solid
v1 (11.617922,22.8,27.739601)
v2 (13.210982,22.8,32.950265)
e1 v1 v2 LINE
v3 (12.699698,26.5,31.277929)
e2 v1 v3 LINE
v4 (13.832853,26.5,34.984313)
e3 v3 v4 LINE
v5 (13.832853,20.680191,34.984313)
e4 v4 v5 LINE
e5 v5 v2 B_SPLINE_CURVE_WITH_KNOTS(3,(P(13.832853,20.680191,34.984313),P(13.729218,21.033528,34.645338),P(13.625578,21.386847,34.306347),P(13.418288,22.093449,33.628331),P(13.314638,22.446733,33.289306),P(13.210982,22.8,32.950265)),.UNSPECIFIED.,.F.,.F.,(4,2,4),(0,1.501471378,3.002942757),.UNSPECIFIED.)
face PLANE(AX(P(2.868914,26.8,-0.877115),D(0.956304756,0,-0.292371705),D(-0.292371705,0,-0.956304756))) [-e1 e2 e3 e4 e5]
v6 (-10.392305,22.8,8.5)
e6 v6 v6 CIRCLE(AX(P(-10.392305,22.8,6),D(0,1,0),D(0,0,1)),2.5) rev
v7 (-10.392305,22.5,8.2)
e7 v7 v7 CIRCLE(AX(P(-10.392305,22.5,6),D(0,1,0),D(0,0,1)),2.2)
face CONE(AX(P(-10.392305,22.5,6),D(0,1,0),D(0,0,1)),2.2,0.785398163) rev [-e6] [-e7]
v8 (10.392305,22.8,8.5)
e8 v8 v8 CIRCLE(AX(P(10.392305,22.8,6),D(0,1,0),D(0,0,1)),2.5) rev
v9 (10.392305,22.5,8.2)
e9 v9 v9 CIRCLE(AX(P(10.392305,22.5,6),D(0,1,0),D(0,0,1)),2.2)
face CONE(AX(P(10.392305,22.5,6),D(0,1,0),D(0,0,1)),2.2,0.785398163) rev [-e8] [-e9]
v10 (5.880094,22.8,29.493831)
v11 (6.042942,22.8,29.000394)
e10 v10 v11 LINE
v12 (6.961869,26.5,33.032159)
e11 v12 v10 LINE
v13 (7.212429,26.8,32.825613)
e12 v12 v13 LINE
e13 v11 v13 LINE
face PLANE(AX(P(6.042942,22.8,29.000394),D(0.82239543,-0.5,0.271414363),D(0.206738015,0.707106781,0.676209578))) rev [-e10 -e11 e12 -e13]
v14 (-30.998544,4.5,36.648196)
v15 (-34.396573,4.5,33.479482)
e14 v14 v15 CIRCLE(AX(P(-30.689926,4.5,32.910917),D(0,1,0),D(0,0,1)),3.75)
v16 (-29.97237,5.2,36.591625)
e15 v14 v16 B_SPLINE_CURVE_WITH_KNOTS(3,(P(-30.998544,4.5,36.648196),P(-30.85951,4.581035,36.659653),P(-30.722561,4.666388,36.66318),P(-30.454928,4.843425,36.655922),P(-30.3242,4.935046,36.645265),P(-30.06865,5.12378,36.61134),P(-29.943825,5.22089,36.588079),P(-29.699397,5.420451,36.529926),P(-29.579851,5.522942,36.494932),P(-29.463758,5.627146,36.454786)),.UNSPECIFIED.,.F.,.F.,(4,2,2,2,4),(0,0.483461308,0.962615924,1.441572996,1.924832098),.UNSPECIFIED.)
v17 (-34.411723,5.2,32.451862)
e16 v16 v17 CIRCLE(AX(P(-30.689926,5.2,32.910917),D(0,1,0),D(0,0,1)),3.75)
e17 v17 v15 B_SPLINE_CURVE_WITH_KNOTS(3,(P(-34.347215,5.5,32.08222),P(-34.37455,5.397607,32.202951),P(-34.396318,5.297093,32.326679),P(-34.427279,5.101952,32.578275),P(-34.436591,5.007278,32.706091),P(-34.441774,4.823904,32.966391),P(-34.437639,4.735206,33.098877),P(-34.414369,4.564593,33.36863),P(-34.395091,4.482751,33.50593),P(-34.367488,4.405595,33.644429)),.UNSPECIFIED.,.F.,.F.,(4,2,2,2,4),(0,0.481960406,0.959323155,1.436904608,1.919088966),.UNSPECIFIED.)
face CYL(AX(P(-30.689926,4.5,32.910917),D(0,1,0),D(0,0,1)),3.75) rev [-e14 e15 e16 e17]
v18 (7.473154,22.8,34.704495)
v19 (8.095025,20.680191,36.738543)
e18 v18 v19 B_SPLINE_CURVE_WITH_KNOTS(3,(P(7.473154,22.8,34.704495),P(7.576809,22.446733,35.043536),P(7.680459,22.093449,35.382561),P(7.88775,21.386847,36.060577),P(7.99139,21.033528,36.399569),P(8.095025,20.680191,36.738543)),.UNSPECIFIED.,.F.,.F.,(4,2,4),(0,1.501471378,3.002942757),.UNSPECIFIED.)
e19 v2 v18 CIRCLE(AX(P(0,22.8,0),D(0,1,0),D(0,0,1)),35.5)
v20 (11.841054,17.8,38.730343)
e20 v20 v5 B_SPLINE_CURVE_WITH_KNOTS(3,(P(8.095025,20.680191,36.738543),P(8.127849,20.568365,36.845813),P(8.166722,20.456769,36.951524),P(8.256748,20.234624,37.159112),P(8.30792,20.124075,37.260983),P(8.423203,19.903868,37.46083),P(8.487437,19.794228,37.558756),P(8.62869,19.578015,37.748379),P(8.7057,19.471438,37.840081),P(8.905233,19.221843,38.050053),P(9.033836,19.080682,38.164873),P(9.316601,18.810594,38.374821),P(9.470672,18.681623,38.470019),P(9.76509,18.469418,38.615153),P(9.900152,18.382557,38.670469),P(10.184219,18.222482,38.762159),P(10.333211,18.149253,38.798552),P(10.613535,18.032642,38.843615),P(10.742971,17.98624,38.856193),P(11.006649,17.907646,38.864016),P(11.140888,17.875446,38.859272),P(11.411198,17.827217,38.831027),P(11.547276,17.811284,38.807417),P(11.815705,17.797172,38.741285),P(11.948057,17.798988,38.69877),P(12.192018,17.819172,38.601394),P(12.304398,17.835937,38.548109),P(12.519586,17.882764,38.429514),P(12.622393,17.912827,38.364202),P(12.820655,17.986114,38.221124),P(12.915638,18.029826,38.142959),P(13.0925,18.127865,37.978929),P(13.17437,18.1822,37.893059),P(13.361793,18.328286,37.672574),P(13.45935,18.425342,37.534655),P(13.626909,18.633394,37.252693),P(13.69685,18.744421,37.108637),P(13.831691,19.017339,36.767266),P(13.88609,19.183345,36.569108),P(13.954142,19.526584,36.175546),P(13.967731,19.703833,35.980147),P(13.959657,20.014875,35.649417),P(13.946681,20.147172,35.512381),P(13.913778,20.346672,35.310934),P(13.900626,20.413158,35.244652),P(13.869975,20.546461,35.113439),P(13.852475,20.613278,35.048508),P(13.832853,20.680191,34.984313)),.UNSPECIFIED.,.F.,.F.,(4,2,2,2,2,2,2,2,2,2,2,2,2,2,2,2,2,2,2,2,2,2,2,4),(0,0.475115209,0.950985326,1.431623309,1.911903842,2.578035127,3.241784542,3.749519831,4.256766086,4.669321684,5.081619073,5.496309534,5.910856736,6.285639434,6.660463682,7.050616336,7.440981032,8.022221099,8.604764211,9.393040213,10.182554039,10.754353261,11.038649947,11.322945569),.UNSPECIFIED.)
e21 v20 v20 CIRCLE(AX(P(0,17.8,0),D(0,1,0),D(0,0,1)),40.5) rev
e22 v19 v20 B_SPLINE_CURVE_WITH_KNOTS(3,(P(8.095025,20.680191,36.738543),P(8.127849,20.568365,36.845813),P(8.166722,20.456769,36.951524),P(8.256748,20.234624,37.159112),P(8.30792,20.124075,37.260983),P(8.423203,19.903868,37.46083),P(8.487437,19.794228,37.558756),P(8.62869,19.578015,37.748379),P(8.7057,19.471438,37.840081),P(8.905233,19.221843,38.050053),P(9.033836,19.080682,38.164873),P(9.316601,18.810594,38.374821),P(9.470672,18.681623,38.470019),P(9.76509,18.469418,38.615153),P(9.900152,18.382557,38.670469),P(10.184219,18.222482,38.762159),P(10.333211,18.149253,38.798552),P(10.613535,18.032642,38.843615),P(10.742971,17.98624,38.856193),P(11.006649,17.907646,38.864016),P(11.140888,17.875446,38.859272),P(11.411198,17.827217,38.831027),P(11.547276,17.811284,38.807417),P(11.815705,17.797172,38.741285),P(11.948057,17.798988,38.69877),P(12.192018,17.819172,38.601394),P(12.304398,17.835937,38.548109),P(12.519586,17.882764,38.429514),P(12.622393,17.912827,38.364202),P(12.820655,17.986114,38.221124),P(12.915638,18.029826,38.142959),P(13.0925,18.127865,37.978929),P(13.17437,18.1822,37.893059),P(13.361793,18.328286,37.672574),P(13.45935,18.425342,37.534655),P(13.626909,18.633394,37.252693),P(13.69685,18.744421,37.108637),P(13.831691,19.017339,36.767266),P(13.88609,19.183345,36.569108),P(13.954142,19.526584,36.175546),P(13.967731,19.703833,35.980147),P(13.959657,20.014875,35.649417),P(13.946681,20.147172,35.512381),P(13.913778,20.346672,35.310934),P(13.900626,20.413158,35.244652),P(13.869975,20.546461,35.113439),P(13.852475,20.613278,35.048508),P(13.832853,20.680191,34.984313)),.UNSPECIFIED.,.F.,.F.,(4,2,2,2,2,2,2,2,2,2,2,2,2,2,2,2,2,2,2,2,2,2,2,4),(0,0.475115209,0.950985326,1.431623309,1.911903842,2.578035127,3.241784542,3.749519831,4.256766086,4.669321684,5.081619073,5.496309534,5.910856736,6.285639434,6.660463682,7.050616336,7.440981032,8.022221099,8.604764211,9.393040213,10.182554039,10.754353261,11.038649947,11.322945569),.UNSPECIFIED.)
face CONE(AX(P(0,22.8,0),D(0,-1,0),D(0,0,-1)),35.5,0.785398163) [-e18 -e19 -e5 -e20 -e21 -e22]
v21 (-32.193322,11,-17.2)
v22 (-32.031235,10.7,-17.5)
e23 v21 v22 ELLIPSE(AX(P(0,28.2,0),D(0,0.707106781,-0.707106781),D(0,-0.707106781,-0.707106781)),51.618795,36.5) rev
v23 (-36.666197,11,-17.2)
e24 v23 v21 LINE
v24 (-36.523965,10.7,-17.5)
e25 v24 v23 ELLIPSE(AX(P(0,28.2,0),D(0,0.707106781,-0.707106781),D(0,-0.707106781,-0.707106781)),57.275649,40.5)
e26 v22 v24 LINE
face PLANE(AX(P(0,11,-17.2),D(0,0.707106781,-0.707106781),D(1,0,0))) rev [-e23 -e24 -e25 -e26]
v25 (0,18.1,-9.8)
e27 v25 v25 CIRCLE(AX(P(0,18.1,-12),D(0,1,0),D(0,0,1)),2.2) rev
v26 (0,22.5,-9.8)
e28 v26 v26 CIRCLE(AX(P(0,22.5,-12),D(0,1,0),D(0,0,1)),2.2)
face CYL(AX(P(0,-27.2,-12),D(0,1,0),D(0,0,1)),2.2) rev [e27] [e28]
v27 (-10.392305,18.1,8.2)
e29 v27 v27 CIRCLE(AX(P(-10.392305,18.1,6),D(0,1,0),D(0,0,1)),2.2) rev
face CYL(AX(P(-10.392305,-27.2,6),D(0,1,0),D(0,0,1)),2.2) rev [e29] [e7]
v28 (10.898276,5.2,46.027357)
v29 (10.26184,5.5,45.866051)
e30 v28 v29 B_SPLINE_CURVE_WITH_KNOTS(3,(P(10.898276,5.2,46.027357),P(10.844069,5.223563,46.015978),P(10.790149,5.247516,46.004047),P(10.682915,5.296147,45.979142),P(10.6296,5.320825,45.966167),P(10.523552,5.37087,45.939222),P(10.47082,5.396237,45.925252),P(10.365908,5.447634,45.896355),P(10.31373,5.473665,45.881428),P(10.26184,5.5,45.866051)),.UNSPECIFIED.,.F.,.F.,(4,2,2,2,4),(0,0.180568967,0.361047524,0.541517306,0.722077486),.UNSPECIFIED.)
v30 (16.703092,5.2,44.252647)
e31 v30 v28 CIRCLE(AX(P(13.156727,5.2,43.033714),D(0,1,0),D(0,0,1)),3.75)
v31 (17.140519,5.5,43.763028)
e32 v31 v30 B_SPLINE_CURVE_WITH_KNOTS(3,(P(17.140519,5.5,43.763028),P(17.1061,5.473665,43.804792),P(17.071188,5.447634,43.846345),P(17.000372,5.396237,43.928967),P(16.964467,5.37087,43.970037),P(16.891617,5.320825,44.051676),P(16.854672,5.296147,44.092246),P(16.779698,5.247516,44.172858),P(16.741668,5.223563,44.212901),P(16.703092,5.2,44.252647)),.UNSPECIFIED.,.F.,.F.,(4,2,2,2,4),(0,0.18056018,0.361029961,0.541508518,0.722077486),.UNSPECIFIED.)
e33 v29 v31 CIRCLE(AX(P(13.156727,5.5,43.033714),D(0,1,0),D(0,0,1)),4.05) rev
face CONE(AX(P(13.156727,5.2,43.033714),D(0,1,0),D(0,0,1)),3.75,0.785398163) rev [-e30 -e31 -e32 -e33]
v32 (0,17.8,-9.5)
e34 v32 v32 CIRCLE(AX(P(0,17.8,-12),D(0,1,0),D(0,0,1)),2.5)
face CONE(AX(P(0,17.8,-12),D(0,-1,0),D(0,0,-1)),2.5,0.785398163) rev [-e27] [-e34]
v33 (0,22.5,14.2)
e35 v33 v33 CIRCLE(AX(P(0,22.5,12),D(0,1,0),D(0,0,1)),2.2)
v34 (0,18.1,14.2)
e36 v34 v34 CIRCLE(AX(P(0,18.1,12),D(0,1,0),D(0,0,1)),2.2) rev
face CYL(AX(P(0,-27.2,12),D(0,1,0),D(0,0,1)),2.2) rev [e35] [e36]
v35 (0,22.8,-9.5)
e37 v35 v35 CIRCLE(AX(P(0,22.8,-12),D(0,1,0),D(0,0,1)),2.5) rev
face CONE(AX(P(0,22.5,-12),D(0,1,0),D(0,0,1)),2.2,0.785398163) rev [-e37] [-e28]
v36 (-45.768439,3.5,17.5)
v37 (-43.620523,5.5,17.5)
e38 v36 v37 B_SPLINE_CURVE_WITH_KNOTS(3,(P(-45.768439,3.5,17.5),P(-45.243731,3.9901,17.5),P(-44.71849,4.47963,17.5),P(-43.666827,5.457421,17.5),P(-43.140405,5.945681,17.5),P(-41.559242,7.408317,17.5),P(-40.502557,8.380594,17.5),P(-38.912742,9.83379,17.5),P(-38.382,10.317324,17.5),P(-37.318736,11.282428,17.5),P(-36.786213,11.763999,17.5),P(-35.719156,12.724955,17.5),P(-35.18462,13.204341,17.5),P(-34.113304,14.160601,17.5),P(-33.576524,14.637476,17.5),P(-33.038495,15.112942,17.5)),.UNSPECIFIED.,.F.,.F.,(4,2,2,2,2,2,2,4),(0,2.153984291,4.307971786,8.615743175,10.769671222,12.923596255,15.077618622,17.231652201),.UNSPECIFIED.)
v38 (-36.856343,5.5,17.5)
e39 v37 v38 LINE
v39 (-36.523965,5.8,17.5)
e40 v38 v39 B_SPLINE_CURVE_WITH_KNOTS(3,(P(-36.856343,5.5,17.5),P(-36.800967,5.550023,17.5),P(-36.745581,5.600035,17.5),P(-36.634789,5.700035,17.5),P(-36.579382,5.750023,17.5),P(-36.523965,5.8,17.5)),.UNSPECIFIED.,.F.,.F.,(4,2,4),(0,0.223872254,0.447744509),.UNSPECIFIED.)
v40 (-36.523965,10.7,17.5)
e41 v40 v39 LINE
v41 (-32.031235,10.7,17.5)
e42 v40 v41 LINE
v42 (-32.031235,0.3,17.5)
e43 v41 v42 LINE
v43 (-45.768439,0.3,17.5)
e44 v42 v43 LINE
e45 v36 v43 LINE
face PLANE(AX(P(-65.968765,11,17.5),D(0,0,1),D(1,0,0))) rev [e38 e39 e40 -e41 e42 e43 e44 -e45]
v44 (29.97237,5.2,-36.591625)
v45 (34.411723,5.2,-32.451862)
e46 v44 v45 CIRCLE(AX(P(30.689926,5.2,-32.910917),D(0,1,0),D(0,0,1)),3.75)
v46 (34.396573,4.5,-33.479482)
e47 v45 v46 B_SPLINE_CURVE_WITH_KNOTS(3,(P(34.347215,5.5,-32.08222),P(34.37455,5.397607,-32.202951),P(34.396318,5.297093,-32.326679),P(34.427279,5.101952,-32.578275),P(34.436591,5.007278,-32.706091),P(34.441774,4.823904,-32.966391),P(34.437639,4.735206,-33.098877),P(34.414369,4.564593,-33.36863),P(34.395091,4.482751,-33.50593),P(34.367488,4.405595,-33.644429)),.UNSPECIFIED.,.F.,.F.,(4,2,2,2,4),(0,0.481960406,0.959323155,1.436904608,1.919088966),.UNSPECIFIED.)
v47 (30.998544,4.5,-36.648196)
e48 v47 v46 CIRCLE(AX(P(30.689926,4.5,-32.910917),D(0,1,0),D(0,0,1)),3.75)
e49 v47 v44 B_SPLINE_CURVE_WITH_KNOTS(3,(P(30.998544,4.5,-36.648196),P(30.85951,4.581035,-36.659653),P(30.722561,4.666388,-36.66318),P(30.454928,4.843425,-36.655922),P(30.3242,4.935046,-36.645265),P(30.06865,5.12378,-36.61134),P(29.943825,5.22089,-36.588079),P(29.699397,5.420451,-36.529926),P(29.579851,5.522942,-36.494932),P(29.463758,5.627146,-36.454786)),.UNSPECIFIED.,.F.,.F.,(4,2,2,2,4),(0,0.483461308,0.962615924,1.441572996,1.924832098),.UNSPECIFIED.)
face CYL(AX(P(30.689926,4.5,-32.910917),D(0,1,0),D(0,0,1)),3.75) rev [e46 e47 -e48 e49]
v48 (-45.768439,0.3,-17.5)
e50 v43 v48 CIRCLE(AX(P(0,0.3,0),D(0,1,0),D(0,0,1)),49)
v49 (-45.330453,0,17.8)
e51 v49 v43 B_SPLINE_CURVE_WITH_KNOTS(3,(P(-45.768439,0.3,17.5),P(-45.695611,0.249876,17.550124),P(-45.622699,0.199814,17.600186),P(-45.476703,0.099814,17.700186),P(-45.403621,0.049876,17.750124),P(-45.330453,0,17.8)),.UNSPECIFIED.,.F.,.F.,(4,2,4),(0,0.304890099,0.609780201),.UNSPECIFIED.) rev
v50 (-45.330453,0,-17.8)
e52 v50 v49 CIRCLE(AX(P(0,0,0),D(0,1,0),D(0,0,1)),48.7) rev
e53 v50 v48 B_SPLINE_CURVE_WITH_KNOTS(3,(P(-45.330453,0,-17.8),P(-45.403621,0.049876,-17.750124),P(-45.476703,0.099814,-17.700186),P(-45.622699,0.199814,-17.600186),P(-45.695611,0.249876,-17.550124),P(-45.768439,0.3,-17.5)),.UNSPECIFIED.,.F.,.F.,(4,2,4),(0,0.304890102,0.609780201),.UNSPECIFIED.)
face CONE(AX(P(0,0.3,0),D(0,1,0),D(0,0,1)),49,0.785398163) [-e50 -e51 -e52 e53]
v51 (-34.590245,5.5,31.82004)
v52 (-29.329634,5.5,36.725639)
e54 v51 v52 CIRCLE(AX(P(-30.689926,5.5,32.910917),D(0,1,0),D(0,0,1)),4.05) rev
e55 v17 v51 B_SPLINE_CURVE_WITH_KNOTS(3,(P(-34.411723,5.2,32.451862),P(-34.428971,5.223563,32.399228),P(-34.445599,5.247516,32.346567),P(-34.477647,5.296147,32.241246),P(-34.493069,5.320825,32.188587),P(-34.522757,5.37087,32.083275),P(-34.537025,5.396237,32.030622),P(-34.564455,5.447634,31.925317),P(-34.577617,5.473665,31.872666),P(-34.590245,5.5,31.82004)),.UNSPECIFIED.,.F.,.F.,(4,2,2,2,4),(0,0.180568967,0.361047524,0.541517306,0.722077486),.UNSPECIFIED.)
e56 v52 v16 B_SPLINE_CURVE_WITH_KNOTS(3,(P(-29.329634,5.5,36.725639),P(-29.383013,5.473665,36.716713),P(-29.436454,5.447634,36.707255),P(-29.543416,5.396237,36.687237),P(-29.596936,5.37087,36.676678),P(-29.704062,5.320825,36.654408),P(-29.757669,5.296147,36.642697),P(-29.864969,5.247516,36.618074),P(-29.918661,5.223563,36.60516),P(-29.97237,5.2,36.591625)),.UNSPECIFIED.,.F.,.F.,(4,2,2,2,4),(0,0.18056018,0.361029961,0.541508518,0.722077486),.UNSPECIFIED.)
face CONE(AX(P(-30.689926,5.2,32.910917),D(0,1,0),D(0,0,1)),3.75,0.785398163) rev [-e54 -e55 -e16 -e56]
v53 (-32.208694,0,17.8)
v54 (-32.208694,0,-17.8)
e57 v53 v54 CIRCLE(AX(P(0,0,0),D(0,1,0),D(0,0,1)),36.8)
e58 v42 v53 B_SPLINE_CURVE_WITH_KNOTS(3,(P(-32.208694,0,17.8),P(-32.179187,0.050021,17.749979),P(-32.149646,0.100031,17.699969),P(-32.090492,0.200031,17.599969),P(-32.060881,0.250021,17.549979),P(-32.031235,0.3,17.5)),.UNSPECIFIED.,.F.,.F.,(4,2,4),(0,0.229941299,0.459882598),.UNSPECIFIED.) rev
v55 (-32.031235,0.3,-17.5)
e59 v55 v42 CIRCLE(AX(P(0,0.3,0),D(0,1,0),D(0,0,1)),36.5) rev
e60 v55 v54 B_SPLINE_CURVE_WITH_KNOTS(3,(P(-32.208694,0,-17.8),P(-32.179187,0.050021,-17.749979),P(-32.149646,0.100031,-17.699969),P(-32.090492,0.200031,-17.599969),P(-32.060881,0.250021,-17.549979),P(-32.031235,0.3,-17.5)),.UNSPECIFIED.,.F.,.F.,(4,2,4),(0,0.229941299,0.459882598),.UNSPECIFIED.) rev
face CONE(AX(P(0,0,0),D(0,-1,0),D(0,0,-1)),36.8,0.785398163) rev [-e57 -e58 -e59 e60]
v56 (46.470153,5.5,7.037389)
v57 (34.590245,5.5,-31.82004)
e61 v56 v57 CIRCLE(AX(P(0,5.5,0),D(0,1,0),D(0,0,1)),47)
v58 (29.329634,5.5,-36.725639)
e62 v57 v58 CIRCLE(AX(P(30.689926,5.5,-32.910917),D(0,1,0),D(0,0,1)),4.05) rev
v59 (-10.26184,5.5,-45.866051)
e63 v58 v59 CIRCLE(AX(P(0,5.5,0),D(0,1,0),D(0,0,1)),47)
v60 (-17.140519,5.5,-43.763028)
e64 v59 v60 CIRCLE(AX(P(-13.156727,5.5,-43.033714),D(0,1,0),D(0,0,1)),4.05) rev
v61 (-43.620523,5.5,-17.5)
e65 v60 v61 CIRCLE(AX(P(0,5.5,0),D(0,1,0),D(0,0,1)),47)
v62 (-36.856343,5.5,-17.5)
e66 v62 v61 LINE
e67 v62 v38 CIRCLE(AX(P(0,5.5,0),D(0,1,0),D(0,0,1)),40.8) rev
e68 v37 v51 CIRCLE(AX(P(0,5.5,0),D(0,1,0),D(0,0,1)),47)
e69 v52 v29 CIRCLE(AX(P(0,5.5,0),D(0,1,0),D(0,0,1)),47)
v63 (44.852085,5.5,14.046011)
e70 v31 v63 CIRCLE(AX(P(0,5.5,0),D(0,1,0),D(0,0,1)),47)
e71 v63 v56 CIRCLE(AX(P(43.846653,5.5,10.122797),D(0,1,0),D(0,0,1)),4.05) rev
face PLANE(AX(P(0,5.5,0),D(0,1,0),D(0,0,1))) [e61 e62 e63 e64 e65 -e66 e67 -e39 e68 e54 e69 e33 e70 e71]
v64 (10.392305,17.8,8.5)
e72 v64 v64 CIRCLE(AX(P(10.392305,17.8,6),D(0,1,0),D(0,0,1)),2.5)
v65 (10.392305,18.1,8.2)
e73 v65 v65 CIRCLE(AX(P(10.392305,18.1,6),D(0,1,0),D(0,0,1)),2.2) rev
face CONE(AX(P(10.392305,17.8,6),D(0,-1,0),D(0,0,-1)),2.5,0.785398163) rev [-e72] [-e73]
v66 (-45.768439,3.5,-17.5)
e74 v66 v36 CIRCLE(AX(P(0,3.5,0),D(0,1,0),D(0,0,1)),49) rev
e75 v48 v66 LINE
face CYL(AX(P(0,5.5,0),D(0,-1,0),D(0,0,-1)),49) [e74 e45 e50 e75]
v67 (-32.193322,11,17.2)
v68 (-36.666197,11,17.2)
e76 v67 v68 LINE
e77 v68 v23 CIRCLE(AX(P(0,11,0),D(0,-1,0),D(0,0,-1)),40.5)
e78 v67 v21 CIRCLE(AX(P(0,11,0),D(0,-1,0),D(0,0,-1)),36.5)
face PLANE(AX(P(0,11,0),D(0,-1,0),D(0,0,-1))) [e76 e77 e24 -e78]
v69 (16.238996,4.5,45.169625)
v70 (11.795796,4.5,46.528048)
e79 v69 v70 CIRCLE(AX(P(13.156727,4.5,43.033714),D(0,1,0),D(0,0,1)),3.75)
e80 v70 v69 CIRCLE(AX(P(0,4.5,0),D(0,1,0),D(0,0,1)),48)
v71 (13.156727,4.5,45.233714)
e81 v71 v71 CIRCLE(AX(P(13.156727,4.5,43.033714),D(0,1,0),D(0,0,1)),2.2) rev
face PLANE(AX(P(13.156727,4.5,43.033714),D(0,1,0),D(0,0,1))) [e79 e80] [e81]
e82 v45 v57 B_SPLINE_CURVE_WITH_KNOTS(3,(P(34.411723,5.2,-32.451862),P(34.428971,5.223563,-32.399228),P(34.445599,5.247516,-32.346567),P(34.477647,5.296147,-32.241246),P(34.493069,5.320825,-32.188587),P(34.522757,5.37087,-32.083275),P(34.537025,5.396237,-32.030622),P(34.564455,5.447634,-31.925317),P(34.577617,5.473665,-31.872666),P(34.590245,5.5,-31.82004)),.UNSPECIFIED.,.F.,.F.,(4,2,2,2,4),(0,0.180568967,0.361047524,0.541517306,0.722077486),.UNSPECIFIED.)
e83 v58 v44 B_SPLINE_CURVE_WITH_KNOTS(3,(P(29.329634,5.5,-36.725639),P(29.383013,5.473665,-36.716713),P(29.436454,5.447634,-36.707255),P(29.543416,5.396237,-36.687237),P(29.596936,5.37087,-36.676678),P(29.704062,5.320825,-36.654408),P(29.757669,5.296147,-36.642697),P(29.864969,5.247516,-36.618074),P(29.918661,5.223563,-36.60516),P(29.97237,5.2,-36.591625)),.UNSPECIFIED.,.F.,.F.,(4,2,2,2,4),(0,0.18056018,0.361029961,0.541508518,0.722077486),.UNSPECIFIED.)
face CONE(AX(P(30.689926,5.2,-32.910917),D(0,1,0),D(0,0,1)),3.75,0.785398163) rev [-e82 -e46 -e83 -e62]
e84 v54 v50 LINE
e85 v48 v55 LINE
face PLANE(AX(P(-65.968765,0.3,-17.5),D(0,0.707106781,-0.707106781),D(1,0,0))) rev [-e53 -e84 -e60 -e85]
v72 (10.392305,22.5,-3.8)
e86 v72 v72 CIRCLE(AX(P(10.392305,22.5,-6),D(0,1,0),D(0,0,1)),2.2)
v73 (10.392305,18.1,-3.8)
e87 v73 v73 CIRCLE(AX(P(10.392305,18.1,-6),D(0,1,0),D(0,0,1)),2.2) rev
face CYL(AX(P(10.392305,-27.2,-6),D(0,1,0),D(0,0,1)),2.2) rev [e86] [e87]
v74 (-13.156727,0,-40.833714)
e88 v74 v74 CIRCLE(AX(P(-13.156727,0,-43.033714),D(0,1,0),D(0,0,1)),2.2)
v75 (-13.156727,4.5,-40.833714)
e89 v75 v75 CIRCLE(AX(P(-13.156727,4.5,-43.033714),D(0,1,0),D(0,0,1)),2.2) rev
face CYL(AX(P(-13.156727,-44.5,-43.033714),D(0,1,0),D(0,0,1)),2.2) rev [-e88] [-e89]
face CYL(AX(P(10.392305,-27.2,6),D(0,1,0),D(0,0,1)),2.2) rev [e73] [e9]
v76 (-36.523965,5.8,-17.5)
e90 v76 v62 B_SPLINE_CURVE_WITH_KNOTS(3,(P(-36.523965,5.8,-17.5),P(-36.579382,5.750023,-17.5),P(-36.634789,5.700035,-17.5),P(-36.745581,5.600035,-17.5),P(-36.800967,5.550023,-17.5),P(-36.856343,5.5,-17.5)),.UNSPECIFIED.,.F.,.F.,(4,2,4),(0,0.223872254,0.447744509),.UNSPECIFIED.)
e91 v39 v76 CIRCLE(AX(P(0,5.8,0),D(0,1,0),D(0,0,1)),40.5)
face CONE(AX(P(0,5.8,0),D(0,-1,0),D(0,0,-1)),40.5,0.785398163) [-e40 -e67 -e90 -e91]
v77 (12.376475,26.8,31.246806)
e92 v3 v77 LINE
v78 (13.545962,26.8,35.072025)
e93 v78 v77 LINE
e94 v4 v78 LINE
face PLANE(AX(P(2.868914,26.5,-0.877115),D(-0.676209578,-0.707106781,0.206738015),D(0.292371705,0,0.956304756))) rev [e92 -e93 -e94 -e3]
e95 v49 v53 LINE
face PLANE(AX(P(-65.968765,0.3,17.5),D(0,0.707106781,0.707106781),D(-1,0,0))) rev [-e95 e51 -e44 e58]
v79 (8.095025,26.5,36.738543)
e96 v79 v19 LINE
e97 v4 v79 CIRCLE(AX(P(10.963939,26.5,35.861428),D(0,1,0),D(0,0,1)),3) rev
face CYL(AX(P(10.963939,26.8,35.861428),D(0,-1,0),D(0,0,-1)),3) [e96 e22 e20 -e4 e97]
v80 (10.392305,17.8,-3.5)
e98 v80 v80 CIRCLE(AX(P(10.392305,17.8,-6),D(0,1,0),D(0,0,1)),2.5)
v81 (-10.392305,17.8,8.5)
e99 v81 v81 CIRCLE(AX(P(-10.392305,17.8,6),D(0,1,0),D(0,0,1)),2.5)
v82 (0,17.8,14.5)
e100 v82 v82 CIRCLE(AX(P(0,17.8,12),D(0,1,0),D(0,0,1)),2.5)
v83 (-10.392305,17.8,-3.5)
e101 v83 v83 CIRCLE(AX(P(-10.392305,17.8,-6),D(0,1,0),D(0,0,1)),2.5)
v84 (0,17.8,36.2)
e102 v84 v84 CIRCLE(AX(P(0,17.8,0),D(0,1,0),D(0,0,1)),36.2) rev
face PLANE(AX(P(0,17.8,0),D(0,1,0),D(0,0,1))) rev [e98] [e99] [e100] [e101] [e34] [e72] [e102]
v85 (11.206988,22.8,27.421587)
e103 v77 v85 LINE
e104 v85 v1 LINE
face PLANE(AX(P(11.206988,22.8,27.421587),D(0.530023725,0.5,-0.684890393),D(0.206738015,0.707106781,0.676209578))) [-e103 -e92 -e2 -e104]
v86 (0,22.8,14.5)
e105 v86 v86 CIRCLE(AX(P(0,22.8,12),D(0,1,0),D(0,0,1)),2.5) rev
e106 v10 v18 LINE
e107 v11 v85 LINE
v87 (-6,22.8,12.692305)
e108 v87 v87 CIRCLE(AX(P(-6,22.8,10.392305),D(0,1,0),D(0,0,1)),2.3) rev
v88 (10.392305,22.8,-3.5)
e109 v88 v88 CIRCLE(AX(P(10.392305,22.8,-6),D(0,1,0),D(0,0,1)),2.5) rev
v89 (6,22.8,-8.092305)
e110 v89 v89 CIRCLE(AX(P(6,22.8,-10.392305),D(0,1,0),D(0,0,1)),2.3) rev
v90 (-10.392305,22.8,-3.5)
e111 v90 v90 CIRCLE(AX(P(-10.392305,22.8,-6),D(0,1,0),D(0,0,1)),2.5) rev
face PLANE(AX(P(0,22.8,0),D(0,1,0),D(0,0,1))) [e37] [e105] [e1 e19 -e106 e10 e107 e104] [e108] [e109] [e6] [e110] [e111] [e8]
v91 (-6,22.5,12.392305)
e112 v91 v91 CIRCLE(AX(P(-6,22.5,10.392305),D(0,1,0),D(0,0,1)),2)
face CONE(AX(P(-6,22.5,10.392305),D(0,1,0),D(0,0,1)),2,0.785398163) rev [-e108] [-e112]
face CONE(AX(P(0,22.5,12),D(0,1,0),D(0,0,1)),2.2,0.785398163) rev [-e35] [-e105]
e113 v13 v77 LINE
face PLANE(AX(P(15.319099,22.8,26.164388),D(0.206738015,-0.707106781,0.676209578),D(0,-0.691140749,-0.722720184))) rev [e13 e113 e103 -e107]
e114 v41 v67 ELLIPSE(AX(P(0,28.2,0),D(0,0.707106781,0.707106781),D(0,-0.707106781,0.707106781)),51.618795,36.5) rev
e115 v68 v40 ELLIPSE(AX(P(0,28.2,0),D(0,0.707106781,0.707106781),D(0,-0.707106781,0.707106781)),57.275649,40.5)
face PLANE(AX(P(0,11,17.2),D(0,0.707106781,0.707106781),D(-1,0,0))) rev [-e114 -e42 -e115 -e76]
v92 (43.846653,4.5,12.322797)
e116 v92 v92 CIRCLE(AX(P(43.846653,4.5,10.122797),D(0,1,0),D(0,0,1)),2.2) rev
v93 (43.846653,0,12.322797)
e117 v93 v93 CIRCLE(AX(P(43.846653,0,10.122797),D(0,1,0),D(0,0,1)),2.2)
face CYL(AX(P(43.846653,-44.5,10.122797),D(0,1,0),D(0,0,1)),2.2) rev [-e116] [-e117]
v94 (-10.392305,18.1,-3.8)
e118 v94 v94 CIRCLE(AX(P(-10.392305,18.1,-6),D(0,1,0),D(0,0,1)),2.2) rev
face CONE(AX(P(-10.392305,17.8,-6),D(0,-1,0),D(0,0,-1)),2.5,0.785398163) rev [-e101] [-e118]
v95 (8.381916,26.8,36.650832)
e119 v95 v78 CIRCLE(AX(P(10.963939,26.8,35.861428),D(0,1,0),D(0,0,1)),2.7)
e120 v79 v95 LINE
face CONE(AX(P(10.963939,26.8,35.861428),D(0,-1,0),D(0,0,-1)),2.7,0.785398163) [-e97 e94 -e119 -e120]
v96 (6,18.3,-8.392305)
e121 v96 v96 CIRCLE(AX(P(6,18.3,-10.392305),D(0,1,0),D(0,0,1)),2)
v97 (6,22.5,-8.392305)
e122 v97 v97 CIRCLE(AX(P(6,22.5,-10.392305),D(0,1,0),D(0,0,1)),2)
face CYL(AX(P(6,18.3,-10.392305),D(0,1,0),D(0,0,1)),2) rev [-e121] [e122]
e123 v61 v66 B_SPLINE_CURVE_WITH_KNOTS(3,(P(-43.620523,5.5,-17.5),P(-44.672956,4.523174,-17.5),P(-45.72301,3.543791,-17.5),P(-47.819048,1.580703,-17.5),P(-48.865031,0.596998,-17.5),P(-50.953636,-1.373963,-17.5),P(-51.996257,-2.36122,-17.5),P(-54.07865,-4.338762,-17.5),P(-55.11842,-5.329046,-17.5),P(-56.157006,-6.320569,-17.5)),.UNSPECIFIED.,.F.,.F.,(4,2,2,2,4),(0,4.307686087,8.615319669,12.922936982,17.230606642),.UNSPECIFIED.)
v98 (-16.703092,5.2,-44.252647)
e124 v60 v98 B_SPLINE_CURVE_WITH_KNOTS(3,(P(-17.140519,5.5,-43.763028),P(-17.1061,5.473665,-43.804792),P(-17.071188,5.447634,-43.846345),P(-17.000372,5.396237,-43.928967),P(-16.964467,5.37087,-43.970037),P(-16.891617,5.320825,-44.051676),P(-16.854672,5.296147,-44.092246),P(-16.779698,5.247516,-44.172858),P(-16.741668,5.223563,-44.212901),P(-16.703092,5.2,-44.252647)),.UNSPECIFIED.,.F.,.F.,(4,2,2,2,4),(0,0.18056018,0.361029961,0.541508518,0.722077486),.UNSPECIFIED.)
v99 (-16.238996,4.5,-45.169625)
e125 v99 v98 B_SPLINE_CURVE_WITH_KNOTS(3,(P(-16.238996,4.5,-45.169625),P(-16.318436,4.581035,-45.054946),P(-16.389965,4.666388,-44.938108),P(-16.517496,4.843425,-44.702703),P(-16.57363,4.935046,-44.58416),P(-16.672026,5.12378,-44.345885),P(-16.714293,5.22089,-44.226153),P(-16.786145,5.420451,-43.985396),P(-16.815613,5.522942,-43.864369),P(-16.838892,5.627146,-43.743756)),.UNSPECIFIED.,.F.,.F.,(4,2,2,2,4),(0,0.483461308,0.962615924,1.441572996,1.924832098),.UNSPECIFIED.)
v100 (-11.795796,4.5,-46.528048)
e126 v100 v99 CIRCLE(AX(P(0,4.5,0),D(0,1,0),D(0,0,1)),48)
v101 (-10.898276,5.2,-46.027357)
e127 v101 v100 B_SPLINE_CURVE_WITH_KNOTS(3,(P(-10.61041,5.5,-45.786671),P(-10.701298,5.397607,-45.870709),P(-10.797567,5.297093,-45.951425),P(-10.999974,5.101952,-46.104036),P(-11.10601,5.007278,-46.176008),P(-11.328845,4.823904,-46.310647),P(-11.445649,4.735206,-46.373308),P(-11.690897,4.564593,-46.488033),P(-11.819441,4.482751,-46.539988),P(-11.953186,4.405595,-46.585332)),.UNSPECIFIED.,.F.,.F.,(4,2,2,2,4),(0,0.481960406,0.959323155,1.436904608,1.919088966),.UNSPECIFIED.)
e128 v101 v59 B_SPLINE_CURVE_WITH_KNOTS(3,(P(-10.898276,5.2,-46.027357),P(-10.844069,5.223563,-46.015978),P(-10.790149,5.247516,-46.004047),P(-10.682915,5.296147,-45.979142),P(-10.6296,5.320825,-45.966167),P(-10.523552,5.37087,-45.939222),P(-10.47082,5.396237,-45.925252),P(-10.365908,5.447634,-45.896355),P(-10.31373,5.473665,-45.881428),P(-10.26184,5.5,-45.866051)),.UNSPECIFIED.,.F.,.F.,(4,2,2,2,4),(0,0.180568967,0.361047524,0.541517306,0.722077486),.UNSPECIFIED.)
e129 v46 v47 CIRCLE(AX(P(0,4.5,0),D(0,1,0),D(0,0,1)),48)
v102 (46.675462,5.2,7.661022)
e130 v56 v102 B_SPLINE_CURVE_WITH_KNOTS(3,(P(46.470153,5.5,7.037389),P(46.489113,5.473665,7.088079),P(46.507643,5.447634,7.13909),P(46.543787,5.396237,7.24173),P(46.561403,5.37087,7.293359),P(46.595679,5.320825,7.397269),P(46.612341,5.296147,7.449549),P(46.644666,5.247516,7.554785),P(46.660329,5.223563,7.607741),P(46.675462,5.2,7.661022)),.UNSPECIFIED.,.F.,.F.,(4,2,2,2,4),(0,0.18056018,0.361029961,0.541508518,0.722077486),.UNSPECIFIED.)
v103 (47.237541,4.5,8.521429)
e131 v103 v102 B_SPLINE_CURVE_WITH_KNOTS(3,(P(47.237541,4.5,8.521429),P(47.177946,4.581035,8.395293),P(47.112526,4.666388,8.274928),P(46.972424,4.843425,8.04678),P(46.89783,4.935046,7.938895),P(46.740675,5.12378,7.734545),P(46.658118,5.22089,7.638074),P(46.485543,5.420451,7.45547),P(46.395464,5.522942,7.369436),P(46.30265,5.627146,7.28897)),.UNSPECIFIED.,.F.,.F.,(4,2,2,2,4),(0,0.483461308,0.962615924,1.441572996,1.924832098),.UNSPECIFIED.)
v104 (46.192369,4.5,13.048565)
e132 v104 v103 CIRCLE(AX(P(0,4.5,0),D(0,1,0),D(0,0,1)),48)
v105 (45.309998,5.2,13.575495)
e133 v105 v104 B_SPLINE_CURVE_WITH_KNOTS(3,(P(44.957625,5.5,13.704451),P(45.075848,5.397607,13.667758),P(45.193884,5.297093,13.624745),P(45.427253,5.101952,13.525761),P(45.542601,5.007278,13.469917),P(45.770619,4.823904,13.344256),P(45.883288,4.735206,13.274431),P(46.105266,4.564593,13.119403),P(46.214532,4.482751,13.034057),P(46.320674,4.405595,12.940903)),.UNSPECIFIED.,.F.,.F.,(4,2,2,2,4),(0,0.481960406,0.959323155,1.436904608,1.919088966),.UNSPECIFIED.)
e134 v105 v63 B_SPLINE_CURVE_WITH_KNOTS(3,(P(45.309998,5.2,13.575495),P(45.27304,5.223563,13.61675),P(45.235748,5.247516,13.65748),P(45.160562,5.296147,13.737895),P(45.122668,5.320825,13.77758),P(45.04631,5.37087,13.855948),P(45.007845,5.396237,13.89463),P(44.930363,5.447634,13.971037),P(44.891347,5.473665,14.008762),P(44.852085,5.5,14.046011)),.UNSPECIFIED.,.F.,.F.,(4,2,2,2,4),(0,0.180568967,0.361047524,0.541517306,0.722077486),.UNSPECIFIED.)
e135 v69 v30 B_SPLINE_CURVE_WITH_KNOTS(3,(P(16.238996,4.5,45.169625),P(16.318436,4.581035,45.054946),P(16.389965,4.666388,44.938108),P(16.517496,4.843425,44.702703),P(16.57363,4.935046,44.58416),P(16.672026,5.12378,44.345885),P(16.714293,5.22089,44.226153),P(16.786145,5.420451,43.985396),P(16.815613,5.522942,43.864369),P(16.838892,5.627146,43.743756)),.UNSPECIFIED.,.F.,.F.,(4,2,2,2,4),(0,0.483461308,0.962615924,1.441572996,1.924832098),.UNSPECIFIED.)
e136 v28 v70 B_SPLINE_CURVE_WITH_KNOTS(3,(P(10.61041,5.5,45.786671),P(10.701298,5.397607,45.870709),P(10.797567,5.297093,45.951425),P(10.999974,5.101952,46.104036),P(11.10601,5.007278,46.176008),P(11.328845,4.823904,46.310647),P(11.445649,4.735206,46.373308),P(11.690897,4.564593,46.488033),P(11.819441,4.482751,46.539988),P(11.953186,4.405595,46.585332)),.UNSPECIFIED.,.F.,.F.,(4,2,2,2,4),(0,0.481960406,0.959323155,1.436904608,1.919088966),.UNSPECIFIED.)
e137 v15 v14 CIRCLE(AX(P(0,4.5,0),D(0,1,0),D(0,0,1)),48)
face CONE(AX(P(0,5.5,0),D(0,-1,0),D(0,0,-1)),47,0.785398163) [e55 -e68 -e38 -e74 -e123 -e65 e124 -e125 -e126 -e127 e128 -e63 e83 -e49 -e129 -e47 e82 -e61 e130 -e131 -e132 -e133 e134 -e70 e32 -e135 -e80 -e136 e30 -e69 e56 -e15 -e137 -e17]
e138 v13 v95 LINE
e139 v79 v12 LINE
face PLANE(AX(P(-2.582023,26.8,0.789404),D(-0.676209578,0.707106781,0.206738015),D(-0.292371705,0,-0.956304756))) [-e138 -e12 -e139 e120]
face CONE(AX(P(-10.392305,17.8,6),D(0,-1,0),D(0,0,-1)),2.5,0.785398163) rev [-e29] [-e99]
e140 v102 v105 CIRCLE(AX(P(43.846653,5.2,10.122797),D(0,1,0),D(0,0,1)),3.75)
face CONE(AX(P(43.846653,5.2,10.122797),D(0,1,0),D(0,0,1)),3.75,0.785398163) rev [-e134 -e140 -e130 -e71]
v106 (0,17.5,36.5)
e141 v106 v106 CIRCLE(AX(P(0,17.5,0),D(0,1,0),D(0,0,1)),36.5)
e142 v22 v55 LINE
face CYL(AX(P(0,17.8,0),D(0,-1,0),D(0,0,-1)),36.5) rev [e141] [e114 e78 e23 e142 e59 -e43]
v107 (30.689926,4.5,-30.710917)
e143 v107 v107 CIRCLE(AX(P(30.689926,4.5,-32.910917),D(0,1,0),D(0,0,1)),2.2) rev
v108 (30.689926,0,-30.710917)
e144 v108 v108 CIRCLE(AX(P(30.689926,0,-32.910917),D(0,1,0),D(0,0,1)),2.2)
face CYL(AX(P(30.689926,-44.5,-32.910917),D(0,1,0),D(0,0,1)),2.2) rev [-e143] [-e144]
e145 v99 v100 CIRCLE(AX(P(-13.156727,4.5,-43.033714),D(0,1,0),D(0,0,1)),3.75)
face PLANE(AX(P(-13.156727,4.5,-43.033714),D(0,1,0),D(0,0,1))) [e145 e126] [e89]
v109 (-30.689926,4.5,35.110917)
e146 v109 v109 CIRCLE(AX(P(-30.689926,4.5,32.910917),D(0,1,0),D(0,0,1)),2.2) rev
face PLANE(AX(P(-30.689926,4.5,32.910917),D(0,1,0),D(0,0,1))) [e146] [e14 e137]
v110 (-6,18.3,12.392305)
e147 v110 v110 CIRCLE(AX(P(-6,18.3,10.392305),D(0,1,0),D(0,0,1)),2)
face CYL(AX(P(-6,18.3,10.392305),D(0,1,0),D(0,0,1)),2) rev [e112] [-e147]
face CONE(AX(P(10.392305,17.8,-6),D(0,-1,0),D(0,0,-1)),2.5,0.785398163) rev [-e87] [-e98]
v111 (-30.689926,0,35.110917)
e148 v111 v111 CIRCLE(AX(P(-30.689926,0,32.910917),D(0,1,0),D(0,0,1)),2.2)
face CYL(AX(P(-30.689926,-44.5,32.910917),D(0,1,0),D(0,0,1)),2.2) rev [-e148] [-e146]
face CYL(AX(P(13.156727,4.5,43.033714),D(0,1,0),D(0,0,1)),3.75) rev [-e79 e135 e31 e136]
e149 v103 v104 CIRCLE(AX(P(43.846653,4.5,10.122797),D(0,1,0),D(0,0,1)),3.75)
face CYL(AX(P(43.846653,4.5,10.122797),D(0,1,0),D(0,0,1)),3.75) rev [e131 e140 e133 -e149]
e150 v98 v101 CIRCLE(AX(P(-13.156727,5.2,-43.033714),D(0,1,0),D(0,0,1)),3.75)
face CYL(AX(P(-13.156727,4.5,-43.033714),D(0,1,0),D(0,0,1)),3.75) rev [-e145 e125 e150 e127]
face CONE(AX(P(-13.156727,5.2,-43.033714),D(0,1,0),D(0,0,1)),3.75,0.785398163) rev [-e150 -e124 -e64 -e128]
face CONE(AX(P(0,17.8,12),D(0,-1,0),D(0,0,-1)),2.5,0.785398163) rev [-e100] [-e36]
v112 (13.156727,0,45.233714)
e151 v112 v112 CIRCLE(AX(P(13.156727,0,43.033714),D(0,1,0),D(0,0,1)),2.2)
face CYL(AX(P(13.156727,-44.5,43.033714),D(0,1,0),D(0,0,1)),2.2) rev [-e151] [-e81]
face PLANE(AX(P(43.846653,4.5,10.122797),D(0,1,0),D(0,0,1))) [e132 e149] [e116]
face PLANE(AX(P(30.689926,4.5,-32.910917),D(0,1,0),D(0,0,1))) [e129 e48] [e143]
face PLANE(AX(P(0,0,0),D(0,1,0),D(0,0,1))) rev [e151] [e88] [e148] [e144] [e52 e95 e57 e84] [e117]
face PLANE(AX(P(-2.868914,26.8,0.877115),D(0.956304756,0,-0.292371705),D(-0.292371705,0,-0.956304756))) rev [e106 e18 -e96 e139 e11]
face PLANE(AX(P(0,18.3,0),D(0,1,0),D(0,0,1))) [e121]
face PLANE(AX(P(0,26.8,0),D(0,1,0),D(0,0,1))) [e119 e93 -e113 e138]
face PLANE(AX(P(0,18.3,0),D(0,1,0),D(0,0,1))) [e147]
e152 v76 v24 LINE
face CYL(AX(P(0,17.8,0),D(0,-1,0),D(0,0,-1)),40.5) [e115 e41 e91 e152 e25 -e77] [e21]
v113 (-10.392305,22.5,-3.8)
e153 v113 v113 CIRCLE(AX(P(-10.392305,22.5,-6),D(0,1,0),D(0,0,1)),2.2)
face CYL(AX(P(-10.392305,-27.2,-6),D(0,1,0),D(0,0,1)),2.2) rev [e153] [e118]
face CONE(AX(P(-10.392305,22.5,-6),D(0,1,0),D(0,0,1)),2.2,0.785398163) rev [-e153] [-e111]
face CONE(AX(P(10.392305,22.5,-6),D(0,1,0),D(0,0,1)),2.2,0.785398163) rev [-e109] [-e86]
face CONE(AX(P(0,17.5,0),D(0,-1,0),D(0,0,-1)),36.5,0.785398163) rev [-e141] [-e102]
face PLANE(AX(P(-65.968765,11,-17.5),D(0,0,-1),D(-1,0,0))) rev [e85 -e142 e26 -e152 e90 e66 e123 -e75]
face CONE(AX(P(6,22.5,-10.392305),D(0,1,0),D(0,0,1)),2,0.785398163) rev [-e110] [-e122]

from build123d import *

# Parameters (mm, degrees)
SKETCH_1_R          = 49
SKETCH_1_R_2        = 40.5
EXTRUDE_1_DEPTH     = 5.5
SKETCH_1_5_R        = 40.5
SKETCH_1_5_R_2      = 36.5
EXTRUDE_2_DEPTH     = 17.8
EXTRUDE_START       = 17.8
SKETCH_1_6_R        = 40.5
SKETCH_1_6_R_2      = 36.5
EXTRUDE_3_DEPTH     = 5
SKETCH_2_R          = 2.2
CUT_EXTRUDE_1_DEPTH = 50
SKETCH_3_R          = 2.2
CUT_EXTRUDE_2_DEPTH = 50
SKETCH_4_W          = 33.937530488
SKETCH_4_H          = 35
CUT_EXTRUDE_3_DEPTH = 11
SKETCH_7_R          = 3.75
CUT_EXTRUDE_5_DEPTH = 1
CHAMFER_8_SIZE      = 0.3
CHAMFER_9_SIZE      = 2
CHAMFER_11_SIZE     = 0.3
SKETCH_8_R          = 3
EXTRUDE_4_DEPTH     = 4
CHAMFER_START       = 17.800013545
CHAMFER_12_2_DEPTH  = 4.999986455
CUT_EXTRUDE_8_DEPTH = 10
CHAMFER_13_SIZE     = 0.3
SKETCH_2_3_R        = 2
CUT_EXTRUDE_9_DEPTH = 4.5
CHAMFER_10_SIZE     = 0.3


with BuildPart() as part:
    # 스케치1 → 보스-돌출1 (new body)
    with BuildSketch(Plane(origin=(0, 0, 0), x_dir=(1, 0, 0), z_dir=(0, 1, 0))):
        with Locations(Location((0, 0, 0), (0, 0, 270))):
            Circle(SKETCH_1_R)
        with Locations(Location((0, 0, 0), (0, 0, 270))):
            Circle(SKETCH_1_R_2, mode=Mode.SUBTRACT)
    extrude(amount=EXTRUDE_1_DEPTH)

    # 스케치1<5> → 보스-돌출2 (add)
    with BuildSketch(Plane(origin=(0, 0, 0), x_dir=(1, 0, 0), z_dir=(0, 1, 0))):
        with Locations(Location((0, 0, 0), (0, 0, 270))):
            Circle(SKETCH_1_5_R)
        with Locations(Location((0, 0, 0), (0, 0, 270))):
            Circle(SKETCH_1_5_R_2, mode=Mode.SUBTRACT)
    extrude(amount=EXTRUDE_2_DEPTH)

    # 스케치1<6> → 보스-돌출3 (add)
    # profile 1 of 2: a face of its own
    with BuildSketch(Plane(origin=(0, 0, 0), x_dir=(1, 0, 0), z_dir=(0, 1, 0)).offset(EXTRUDE_START)):
        with Locations(Location((0, 0, 0), (0, 0, 270))):
            Circle(SKETCH_1_6_R)
        with Locations(Location((0, 0, 0), (0, 0, 270))):
            Circle(SKETCH_1_6_R_2, mode=Mode.SUBTRACT)
    # profile 2 of 2: a face of its own
    with BuildSketch(Plane(origin=(0, 0, 0), x_dir=(1, 0, 0), z_dir=(0, 1, 0)).offset(EXTRUDE_START)):
        with Locations(Location((0, 0, 0), (0, 0, 270))):
            Circle(SKETCH_1_6_R_2)
    extrude(amount=EXTRUDE_3_DEPTH)

    # 스케치2 → 컷-돌출1 (cut)
    with BuildSketch(Plane(origin=(0, 22.8, 0), x_dir=(1, 0, 0), z_dir=(0, 1, 0))):
        with Locations(Location((0, 12, 0), (0, 0, 270))):
            Circle(SKETCH_2_R)
        with Locations(Location((10.392304845, 6, 0), (0, 0, 270))):
            Circle(SKETCH_2_R)
        with Locations(Location((10.392304845, -6, 0), (0, 0, 270))):
            Circle(SKETCH_2_R)
        with Locations(Location((0, -12, 0), (0, 0, 270))):
            Circle(SKETCH_2_R)
        with Locations(Location((-10.392304845, -6, 0), (0, 0, 270))):
            Circle(SKETCH_2_R)
        with Locations(Location((-10.392304845, 6, 0), (0, 0, 270))):
            Circle(SKETCH_2_R)
    extrude(amount=-CUT_EXTRUDE_1_DEPTH, mode=Mode.SUBTRACT)

    # 스케치3 → 컷-돌출2 (cut)
    with BuildSketch(Plane(origin=(0, 5.5, 0), x_dir=(1, 0, 0), z_dir=(0, 1, 0))):
        with Locations(Location((-43.846652915, 10.122797445, 0), (0, 0, 270))):
            Circle(SKETCH_3_R)
        with Locations(Location((-13.156726713, 43.033714018, 0), (0, 0, 270))):
            Circle(SKETCH_3_R)
        with Locations(Location((30.689926203, 32.910916573, 0), (0, 0, 270))):
            Circle(SKETCH_3_R)
        with Locations(Location((43.846652915, -10.122797445, 0), (0, 0, 270))):
            Circle(SKETCH_3_R)
        with Locations(Location((13.156726713, -43.033714018, 0), (0, 0, 270))):
            Circle(SKETCH_3_R)
        with Locations(Location((-30.689926203, -32.910916573, 0), (0, 0, 270))):
            Circle(SKETCH_3_R)
    extrude(amount=-CUT_EXTRUDE_2_DEPTH, mode=Mode.SUBTRACT)

    # 스케치4 → 컷-돌출3 (cut)
    with BuildSketch(Plane.XZ):
        with Locations((-49, 0)):
            Rectangle(SKETCH_4_W, SKETCH_4_H)
    extrude(amount=-CUT_EXTRUDE_3_DEPTH, mode=Mode.SUBTRACT)

    # 스케치7 → 컷-돌출5 (cut)
    with BuildSketch(Plane(origin=(0, 5.5, 0), x_dir=(1, 0, 0), z_dir=(0, 1, 0))):
        with Locations(Location((-13.156726713, 43.033714018, 0), (0, 0, 270))):
            Circle(SKETCH_7_R)
        with Locations(Location((30.689926203, 32.910916573, 0), (0, 0, 270))):
            Circle(SKETCH_7_R)
        with Locations(Location((43.846652915, -10.122797445, 0), (0, 0, 270))):
            Circle(SKETCH_7_R)
        with Locations(Location((13.156726713, -43.033714018, 0), (0, 0, 270))):
            Circle(SKETCH_7_R)
        with Locations(Location((-30.689926203, -32.910916573, 0), (0, 0, 270))):
            Circle(SKETCH_7_R)
        with Locations((-43.846652915, 10.122797445)):
            Circle(SKETCH_7_R)
    extrude(amount=-CUT_EXTRUDE_5_DEPTH, mode=Mode.SUBTRACT)

    # 모따기8
    chamfer_8_edges = [part.edges().sort_by_distance(p)[0] for p in [
        (-38.899836832, 0, 17.5),
        (-38.899836832, 0, -17.5),
        (0, 17.8, -36.5),
        (31.392674305, 0, -18.62122445),
        (49, 0, 0),
        (-34.277599746, 11, -17.5),
        (-34.277599746, 11, 17.5),
    ]]
    chamfer(chamfer_8_edges, length=CHAMFER_8_SIZE)

    # 모따기9
    # the kernel refuses this chamfer: 2 mm, written as the material it takes off along each edge
    with BuildSketch(Plane(origin=(0, 5.5, 0), x_dir=(-0.9664639916292301, 0, -0.25680216682126217), z_dir=(-0.25680216682126217, 0, 0.9664639916292301))) as chamfer_9_piece_1:
        Polygon((49, CHAMFER_9_SIZE), (49 - CHAMFER_9_SIZE, 0), (49, 0), align=None)
    revolve(axis=Axis((0, 5.5, 0), (0, -1, 0)), revolution_arc=330.239203437, mode=Mode.SUBTRACT)

    # 모따기11
    chamfer_11_edges = [part.edges().sort_by_distance(p)[0] for p in [
        (34.270978976, 5.5, -21.581241855),
    ]]
    chamfer(chamfer_11_edges, length=CHAMFER_11_SIZE)

    # 스케치8 → 보스-돌출4 (add)
    with BuildSketch(Plane(origin=(0, 22.8, 0), x_dir=(1, 0, 0), z_dir=(0, 1, 0))):
        with Locations((10.963938927, -35.861428349)):
            Circle(SKETCH_8_R)
        with BuildLine():
            Line((11.493879557, -27.333875187), (5.756051021, -29.088105415))
            Line((5.756051021, -29.088105415), (8.095024659, -36.738543463))
            ThreePointArc((8.095024659, -36.738543463), (10.086823813, -32.992514081), (13.832853195, -34.984313234))
            Line((13.832853195, -34.984313234), (11.493879557, -27.333875187))
        make_face()
    extrude(amount=EXTRUDE_4_DEPTH)

    # 모따기12: read off the stored shape, not the designer's step
    # 모따기12 outline → 모따기12 (revolve, cut)
    with BuildSketch(Plane.XY):
        Polygon((40.5, 22.8), (35.5, 22.8), (40.5, 17.8), align=None)
    revolve(axis=Axis((0, 0, 0), (0, 1, 0)), mode=Mode.SUBTRACT)

    # Chamfer 12 2 outline → Chamfer 12 2 (add)
    with BuildSketch(Plane(origin=(0, 0, 0), x_dir=(1, 0, 0), z_dir=(0, 1, 0)).offset(CHAMFER_START)):
        with BuildLine():
            ThreePointArc((8.095024659, -36.738543463), (11.841054042, -38.730342617), (13.832853195, -34.984313234))
            Line((13.832853195, -34.984313234), (12.614726395, -31))
            Line((12.614726395, -31), (6.340575855, -31))
            Line((6.340575855, -31), (8.095024659, -36.738543463))
        make_face()
    extrude(amount=CHAMFER_12_2_DEPTH)

    # 스케치10 → 컷-돌출8 (cut)
    with BuildSketch(Plane(origin=(-2.868914268, 0, 0.877115114), x_dir=(0.29237170472273827, 0, 0.9563047559630351), z_dir=(-0.9563047559630351, 0, 0.29237170472273827))):
        Polygon((29.5, 22.8), (33.5, 26.8), (29.5, 26.8), align=None)
    extrude(amount=-CUT_EXTRUDE_8_DEPTH, mode=Mode.SUBTRACT)

    # 모따기13
    chamfer_13_edges = [part.edges().sort_by_distance(p)[0] for p in [
        (11.841054041, 26.8, 38.730342617),
        (13.248109786, 26.8, 33.071703723),
        (7.51028125, 26.8, 34.825933951),
        (12.078622967, 24.8, 29.246484699),
        (6.340794431, 24.8, 31.000714927),
    ]]
    chamfer(chamfer_13_edges, length=CHAMFER_13_SIZE)

    # 스케치2<3> → 컷-돌출9 (cut)
    with BuildSketch(Plane(origin=(0, 22.8, 0), x_dir=(1, 0, 0), z_dir=(0, 1, 0))):
        with Locations(Location((6, 10.392304845, 0), (0, 0, 270))):
            Circle(SKETCH_2_3_R)
        with Locations(Location((-6, -10.392304845, 0), (0, 0, 270))):
            Circle(SKETCH_2_3_R)
    extrude(amount=-CUT_EXTRUDE_9_DEPTH, mode=Mode.SUBTRACT)

    # 모따기10
    chamfer_10_edges = [part.edges().sort_by_distance(p)[0] for p in [
        (28.132432353, 5.5, -30.168340192),
        (40.192765172, 5.5, 9.279230992),
        (12.06033282, 5.5, 39.447571183),
        (-28.132432353, 5.5, 30.168340192),
        (-12.06033282, 5.5, -39.447571183),
        (0, 17.8, -14.2),
        (-10.392304845, 17.8, -8.2),
        (-10.392304845, 17.8, 3.8),
        (0, 17.8, 9.8),
        (10.392304845, 17.8, -8.2),
        (10.392304845, 17.8, 3.8),
        (0, 22.8, -14.2),
        (-10.392304845, 22.8, -8.2),
        (-10.392304845, 22.8, 3.8),
        (-6, 22.8, 8.392304845),
        (0, 22.8, 9.8),
        (10.392304845, 22.8, 3.8),
        (6, 22.8, -12.392304845),
        (10.392304845, 22.8, -8.2),
    ]]
    chamfer(chamfer_10_edges, length=CHAMFER_10_SIZE)


solid = part.part
